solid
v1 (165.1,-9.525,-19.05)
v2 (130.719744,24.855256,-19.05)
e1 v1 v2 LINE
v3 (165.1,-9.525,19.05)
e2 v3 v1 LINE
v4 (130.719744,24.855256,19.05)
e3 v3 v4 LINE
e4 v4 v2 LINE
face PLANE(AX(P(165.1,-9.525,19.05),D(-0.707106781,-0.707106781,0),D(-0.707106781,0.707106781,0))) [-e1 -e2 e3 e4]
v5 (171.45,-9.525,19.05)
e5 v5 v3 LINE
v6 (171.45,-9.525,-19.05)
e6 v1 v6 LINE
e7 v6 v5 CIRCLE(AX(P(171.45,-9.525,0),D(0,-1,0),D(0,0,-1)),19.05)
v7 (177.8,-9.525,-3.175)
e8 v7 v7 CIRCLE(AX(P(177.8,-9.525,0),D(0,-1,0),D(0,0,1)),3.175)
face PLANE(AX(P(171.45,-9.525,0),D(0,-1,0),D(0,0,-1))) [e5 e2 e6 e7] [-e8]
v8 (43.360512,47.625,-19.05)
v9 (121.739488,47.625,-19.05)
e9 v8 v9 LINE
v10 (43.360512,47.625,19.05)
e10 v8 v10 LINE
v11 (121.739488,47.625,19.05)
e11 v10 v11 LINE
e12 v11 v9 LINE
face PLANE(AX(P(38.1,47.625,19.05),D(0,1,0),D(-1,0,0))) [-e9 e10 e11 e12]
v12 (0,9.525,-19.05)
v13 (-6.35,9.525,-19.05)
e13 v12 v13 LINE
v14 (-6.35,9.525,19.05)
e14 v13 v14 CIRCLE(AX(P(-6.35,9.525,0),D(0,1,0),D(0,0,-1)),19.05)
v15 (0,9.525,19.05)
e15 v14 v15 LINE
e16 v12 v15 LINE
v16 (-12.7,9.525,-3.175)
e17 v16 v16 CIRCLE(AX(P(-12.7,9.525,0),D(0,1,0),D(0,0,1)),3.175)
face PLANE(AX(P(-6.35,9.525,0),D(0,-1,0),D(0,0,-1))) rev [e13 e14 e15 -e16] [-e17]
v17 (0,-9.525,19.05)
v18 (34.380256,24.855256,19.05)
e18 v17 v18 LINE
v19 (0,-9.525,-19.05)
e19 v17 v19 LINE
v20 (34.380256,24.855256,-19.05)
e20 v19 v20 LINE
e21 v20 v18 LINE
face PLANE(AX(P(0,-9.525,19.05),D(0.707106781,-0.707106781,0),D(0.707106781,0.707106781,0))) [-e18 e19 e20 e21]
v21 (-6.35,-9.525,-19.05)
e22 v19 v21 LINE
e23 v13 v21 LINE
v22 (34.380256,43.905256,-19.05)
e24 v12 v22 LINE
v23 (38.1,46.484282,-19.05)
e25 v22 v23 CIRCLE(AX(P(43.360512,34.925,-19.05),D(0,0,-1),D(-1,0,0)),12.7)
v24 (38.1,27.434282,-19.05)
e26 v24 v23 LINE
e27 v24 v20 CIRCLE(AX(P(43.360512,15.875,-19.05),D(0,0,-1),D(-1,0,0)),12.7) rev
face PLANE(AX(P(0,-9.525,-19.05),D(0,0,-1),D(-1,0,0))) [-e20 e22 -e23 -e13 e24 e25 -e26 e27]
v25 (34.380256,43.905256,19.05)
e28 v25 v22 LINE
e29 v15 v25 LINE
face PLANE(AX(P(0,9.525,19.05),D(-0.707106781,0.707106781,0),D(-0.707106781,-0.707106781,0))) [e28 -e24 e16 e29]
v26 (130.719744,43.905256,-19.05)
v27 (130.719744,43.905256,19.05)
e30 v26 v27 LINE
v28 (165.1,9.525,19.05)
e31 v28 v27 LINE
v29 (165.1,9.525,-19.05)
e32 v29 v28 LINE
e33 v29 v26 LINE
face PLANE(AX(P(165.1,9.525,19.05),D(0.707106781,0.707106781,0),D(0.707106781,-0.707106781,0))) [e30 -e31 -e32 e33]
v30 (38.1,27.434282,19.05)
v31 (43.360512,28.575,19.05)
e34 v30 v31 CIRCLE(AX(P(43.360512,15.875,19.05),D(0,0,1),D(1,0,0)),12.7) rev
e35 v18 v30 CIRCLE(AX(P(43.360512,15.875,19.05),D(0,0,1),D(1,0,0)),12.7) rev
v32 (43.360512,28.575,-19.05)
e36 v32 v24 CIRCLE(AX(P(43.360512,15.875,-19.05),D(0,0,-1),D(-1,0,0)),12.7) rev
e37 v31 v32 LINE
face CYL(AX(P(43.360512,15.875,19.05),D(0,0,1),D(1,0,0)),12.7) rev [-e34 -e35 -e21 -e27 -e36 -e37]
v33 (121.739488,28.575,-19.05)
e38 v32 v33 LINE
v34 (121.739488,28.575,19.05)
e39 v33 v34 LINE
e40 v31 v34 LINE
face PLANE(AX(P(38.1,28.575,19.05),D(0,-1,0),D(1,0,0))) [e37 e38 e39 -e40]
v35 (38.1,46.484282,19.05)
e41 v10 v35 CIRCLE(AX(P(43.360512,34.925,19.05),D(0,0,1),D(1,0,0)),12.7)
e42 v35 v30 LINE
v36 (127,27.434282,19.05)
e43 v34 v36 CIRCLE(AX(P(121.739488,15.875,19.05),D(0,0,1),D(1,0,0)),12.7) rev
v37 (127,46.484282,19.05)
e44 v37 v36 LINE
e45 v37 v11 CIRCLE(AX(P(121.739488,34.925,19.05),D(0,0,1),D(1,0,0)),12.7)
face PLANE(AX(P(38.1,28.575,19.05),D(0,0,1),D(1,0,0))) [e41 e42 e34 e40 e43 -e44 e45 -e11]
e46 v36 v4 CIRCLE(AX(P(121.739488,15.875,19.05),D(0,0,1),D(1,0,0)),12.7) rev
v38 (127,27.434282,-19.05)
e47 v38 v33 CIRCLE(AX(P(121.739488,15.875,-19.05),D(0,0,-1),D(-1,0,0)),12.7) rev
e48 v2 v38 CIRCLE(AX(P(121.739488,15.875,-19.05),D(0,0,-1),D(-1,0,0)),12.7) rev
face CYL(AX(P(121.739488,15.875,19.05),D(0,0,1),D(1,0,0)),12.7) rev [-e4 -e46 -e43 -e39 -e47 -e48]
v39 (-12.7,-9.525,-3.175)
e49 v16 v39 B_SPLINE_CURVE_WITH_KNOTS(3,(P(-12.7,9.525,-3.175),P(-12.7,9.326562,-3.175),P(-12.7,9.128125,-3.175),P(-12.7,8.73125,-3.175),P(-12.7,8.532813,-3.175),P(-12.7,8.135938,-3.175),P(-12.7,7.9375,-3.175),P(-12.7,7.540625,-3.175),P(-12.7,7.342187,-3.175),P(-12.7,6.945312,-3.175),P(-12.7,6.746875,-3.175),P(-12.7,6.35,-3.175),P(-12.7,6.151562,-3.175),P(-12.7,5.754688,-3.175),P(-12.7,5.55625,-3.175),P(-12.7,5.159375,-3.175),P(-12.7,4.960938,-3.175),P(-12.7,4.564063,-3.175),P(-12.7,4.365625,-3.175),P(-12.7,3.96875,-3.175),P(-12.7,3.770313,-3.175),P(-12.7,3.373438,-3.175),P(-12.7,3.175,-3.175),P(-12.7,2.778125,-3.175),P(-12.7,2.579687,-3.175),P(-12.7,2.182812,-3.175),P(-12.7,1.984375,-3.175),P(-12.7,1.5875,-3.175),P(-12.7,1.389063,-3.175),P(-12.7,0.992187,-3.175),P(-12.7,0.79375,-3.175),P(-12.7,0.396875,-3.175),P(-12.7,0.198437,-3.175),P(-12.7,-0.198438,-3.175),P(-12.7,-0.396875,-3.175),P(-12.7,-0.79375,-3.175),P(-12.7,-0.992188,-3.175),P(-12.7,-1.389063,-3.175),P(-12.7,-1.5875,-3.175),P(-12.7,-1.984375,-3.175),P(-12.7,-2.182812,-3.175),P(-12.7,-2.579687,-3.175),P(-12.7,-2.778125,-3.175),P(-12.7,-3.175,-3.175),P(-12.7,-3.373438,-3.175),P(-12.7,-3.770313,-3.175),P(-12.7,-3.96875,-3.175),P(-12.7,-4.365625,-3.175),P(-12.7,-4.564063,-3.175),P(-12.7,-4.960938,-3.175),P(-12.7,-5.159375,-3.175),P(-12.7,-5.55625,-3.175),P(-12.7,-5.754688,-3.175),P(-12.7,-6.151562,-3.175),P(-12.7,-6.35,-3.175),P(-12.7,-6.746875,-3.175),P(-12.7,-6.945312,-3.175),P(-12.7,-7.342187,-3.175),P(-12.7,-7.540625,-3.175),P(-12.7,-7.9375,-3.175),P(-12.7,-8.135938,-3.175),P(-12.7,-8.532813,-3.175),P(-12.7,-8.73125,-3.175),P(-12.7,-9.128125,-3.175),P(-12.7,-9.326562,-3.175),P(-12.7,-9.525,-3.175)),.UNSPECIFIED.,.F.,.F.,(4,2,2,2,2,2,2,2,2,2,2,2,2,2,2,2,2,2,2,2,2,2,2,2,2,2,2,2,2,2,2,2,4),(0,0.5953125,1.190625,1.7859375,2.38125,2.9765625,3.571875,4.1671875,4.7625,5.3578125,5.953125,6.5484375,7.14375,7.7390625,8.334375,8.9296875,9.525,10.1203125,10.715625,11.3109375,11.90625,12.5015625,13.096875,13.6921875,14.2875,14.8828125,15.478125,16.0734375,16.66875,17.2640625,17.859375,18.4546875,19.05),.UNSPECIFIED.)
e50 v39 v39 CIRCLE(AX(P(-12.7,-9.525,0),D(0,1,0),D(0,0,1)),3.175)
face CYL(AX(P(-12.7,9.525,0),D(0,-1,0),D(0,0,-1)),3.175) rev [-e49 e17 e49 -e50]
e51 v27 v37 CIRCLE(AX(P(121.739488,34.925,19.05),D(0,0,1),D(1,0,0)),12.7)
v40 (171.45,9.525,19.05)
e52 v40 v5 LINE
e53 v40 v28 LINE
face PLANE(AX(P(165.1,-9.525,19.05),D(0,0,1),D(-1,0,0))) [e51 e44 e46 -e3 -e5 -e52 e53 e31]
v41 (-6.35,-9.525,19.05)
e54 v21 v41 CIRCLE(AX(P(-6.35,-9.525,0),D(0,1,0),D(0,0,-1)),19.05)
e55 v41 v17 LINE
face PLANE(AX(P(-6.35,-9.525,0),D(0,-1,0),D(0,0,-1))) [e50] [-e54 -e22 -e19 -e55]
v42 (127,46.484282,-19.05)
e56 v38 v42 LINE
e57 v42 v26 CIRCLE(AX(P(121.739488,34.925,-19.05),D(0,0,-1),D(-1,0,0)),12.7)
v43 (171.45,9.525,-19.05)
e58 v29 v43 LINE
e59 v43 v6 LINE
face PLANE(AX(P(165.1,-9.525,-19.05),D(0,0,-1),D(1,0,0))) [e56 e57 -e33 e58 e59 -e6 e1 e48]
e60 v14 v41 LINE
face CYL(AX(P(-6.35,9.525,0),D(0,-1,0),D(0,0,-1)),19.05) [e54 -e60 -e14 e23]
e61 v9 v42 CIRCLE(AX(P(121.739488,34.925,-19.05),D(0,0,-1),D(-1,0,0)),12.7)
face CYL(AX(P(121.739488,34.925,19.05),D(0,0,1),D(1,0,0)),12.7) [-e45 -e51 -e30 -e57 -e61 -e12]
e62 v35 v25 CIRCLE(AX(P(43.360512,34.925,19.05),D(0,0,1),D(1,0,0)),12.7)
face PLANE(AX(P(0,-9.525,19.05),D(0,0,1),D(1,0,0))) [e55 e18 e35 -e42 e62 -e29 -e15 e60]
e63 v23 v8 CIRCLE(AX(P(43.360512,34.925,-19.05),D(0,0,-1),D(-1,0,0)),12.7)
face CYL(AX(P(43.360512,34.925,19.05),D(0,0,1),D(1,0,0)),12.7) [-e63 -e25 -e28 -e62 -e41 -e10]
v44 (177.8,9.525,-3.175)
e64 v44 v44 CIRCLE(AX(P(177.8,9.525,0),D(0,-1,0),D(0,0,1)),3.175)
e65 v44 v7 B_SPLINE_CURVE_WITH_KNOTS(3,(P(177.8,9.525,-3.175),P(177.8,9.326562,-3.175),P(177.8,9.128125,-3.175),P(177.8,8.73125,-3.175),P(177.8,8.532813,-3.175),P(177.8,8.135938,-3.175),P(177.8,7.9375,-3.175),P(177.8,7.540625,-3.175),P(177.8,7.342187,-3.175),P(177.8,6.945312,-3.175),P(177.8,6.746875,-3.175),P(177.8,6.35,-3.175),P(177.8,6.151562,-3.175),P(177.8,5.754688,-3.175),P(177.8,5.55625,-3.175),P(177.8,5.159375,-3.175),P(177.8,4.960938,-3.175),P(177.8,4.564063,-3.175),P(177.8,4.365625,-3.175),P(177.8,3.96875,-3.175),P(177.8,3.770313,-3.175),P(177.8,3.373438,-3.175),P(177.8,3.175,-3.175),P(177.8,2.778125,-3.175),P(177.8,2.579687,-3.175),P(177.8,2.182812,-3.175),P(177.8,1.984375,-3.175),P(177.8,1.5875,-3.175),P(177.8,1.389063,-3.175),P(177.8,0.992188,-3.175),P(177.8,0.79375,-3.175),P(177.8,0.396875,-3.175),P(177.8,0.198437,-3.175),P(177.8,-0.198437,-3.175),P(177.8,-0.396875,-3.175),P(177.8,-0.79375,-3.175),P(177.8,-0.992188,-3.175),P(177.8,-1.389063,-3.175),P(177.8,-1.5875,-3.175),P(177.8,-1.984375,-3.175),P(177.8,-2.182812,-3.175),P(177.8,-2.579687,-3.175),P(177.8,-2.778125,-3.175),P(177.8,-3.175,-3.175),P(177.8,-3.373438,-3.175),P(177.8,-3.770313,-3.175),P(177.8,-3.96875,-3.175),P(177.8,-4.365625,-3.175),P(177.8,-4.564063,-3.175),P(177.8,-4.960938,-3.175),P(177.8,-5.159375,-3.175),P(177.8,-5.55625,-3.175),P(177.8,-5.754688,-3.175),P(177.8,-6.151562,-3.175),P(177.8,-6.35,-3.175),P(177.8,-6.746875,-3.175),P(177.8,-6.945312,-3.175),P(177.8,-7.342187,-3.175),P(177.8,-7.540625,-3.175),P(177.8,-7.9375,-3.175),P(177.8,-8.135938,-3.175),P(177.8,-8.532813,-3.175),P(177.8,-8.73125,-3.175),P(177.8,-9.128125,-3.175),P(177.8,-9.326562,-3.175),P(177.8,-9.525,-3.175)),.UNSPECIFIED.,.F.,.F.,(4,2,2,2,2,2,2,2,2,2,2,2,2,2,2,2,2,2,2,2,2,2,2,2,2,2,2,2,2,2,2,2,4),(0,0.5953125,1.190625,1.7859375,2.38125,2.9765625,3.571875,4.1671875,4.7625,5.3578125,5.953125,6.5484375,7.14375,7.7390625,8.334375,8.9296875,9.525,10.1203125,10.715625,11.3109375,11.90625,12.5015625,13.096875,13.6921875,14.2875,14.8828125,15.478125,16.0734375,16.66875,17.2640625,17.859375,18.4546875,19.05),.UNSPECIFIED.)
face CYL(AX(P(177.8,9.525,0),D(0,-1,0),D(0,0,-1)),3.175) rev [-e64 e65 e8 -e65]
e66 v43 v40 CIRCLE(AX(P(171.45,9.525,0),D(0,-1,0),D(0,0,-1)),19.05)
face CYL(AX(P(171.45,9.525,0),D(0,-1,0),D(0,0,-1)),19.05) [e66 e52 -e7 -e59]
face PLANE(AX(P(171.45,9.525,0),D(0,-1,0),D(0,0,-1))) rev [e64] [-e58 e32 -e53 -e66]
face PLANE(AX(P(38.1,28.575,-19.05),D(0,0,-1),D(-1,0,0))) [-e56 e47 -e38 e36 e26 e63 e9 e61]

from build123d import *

# Parameters (mm, degrees)
SWEEP1_START        = -19.05
SWEEP1_DEPTH        = 38.1
BOSS_EXTRUDE1_START = -9.525
SKETCH4_R           = 3.175
BOSS_EXTRUDE1_DEPTH = 19.05
FILLET1_R           = 12.7


# Read off the part's stored shape, not the designer's step: Sweep1
with BuildPart() as part:
    # Sweep1 outline → Sweep1 (new body)
    with BuildSketch(Plane.XY.offset(SWEEP1_START)):
        Polygon((82.55, 28.575), (82.55, 47.625), (38.1, 47.625), (0, 9.525), (0, -9.525), (38.1, 28.575), align=None)
    extrude(amount=SWEEP1_DEPTH)

    # Sketch4 → Boss-Extrude1 (add)
    with BuildSketch(Plane(origin=(0, 0, 0), x_dir=(1, 0, 0), z_dir=(0, 1, 0)).offset(BOSS_EXTRUDE1_START)):
        with BuildLine():
            Line((0, 19.05), (-6.35, 19.05))
            ThreePointArc((-6.35, 19.05), (-25.4, 0), (-6.35, -19.05))
            Line((-6.35, -19.05), (0, -19.05))
            Line((0, -19.05), (0, 19.05))
        make_face()
        with Locations(Location((-12.7, 0, 0), (0, 0, 90))):
            Circle(SKETCH4_R, mode=Mode.SUBTRACT)
    extrude(amount=BOSS_EXTRUDE1_DEPTH)

    # Mirror4: part across plane


with BuildPart() as part_1:
    add(part.part)
    add(part.part.mirror(Plane(origin=(82.55, 0, 0), x_dir=(0, 0, 1), z_dir=(1, 0, 0))))

    # Fillet1
    fillet1_edges = [part_1.edges().sort_by_distance(p)[0] for p in [
        (38.1, 47.625, 0),
        (38.1, 28.575, 0),
        (127, 47.625, 0),
        (127, 28.575, 0),
    ]]
    fillet(fillet1_edges, radius=FILLET1_R)


solid = part_1.part
